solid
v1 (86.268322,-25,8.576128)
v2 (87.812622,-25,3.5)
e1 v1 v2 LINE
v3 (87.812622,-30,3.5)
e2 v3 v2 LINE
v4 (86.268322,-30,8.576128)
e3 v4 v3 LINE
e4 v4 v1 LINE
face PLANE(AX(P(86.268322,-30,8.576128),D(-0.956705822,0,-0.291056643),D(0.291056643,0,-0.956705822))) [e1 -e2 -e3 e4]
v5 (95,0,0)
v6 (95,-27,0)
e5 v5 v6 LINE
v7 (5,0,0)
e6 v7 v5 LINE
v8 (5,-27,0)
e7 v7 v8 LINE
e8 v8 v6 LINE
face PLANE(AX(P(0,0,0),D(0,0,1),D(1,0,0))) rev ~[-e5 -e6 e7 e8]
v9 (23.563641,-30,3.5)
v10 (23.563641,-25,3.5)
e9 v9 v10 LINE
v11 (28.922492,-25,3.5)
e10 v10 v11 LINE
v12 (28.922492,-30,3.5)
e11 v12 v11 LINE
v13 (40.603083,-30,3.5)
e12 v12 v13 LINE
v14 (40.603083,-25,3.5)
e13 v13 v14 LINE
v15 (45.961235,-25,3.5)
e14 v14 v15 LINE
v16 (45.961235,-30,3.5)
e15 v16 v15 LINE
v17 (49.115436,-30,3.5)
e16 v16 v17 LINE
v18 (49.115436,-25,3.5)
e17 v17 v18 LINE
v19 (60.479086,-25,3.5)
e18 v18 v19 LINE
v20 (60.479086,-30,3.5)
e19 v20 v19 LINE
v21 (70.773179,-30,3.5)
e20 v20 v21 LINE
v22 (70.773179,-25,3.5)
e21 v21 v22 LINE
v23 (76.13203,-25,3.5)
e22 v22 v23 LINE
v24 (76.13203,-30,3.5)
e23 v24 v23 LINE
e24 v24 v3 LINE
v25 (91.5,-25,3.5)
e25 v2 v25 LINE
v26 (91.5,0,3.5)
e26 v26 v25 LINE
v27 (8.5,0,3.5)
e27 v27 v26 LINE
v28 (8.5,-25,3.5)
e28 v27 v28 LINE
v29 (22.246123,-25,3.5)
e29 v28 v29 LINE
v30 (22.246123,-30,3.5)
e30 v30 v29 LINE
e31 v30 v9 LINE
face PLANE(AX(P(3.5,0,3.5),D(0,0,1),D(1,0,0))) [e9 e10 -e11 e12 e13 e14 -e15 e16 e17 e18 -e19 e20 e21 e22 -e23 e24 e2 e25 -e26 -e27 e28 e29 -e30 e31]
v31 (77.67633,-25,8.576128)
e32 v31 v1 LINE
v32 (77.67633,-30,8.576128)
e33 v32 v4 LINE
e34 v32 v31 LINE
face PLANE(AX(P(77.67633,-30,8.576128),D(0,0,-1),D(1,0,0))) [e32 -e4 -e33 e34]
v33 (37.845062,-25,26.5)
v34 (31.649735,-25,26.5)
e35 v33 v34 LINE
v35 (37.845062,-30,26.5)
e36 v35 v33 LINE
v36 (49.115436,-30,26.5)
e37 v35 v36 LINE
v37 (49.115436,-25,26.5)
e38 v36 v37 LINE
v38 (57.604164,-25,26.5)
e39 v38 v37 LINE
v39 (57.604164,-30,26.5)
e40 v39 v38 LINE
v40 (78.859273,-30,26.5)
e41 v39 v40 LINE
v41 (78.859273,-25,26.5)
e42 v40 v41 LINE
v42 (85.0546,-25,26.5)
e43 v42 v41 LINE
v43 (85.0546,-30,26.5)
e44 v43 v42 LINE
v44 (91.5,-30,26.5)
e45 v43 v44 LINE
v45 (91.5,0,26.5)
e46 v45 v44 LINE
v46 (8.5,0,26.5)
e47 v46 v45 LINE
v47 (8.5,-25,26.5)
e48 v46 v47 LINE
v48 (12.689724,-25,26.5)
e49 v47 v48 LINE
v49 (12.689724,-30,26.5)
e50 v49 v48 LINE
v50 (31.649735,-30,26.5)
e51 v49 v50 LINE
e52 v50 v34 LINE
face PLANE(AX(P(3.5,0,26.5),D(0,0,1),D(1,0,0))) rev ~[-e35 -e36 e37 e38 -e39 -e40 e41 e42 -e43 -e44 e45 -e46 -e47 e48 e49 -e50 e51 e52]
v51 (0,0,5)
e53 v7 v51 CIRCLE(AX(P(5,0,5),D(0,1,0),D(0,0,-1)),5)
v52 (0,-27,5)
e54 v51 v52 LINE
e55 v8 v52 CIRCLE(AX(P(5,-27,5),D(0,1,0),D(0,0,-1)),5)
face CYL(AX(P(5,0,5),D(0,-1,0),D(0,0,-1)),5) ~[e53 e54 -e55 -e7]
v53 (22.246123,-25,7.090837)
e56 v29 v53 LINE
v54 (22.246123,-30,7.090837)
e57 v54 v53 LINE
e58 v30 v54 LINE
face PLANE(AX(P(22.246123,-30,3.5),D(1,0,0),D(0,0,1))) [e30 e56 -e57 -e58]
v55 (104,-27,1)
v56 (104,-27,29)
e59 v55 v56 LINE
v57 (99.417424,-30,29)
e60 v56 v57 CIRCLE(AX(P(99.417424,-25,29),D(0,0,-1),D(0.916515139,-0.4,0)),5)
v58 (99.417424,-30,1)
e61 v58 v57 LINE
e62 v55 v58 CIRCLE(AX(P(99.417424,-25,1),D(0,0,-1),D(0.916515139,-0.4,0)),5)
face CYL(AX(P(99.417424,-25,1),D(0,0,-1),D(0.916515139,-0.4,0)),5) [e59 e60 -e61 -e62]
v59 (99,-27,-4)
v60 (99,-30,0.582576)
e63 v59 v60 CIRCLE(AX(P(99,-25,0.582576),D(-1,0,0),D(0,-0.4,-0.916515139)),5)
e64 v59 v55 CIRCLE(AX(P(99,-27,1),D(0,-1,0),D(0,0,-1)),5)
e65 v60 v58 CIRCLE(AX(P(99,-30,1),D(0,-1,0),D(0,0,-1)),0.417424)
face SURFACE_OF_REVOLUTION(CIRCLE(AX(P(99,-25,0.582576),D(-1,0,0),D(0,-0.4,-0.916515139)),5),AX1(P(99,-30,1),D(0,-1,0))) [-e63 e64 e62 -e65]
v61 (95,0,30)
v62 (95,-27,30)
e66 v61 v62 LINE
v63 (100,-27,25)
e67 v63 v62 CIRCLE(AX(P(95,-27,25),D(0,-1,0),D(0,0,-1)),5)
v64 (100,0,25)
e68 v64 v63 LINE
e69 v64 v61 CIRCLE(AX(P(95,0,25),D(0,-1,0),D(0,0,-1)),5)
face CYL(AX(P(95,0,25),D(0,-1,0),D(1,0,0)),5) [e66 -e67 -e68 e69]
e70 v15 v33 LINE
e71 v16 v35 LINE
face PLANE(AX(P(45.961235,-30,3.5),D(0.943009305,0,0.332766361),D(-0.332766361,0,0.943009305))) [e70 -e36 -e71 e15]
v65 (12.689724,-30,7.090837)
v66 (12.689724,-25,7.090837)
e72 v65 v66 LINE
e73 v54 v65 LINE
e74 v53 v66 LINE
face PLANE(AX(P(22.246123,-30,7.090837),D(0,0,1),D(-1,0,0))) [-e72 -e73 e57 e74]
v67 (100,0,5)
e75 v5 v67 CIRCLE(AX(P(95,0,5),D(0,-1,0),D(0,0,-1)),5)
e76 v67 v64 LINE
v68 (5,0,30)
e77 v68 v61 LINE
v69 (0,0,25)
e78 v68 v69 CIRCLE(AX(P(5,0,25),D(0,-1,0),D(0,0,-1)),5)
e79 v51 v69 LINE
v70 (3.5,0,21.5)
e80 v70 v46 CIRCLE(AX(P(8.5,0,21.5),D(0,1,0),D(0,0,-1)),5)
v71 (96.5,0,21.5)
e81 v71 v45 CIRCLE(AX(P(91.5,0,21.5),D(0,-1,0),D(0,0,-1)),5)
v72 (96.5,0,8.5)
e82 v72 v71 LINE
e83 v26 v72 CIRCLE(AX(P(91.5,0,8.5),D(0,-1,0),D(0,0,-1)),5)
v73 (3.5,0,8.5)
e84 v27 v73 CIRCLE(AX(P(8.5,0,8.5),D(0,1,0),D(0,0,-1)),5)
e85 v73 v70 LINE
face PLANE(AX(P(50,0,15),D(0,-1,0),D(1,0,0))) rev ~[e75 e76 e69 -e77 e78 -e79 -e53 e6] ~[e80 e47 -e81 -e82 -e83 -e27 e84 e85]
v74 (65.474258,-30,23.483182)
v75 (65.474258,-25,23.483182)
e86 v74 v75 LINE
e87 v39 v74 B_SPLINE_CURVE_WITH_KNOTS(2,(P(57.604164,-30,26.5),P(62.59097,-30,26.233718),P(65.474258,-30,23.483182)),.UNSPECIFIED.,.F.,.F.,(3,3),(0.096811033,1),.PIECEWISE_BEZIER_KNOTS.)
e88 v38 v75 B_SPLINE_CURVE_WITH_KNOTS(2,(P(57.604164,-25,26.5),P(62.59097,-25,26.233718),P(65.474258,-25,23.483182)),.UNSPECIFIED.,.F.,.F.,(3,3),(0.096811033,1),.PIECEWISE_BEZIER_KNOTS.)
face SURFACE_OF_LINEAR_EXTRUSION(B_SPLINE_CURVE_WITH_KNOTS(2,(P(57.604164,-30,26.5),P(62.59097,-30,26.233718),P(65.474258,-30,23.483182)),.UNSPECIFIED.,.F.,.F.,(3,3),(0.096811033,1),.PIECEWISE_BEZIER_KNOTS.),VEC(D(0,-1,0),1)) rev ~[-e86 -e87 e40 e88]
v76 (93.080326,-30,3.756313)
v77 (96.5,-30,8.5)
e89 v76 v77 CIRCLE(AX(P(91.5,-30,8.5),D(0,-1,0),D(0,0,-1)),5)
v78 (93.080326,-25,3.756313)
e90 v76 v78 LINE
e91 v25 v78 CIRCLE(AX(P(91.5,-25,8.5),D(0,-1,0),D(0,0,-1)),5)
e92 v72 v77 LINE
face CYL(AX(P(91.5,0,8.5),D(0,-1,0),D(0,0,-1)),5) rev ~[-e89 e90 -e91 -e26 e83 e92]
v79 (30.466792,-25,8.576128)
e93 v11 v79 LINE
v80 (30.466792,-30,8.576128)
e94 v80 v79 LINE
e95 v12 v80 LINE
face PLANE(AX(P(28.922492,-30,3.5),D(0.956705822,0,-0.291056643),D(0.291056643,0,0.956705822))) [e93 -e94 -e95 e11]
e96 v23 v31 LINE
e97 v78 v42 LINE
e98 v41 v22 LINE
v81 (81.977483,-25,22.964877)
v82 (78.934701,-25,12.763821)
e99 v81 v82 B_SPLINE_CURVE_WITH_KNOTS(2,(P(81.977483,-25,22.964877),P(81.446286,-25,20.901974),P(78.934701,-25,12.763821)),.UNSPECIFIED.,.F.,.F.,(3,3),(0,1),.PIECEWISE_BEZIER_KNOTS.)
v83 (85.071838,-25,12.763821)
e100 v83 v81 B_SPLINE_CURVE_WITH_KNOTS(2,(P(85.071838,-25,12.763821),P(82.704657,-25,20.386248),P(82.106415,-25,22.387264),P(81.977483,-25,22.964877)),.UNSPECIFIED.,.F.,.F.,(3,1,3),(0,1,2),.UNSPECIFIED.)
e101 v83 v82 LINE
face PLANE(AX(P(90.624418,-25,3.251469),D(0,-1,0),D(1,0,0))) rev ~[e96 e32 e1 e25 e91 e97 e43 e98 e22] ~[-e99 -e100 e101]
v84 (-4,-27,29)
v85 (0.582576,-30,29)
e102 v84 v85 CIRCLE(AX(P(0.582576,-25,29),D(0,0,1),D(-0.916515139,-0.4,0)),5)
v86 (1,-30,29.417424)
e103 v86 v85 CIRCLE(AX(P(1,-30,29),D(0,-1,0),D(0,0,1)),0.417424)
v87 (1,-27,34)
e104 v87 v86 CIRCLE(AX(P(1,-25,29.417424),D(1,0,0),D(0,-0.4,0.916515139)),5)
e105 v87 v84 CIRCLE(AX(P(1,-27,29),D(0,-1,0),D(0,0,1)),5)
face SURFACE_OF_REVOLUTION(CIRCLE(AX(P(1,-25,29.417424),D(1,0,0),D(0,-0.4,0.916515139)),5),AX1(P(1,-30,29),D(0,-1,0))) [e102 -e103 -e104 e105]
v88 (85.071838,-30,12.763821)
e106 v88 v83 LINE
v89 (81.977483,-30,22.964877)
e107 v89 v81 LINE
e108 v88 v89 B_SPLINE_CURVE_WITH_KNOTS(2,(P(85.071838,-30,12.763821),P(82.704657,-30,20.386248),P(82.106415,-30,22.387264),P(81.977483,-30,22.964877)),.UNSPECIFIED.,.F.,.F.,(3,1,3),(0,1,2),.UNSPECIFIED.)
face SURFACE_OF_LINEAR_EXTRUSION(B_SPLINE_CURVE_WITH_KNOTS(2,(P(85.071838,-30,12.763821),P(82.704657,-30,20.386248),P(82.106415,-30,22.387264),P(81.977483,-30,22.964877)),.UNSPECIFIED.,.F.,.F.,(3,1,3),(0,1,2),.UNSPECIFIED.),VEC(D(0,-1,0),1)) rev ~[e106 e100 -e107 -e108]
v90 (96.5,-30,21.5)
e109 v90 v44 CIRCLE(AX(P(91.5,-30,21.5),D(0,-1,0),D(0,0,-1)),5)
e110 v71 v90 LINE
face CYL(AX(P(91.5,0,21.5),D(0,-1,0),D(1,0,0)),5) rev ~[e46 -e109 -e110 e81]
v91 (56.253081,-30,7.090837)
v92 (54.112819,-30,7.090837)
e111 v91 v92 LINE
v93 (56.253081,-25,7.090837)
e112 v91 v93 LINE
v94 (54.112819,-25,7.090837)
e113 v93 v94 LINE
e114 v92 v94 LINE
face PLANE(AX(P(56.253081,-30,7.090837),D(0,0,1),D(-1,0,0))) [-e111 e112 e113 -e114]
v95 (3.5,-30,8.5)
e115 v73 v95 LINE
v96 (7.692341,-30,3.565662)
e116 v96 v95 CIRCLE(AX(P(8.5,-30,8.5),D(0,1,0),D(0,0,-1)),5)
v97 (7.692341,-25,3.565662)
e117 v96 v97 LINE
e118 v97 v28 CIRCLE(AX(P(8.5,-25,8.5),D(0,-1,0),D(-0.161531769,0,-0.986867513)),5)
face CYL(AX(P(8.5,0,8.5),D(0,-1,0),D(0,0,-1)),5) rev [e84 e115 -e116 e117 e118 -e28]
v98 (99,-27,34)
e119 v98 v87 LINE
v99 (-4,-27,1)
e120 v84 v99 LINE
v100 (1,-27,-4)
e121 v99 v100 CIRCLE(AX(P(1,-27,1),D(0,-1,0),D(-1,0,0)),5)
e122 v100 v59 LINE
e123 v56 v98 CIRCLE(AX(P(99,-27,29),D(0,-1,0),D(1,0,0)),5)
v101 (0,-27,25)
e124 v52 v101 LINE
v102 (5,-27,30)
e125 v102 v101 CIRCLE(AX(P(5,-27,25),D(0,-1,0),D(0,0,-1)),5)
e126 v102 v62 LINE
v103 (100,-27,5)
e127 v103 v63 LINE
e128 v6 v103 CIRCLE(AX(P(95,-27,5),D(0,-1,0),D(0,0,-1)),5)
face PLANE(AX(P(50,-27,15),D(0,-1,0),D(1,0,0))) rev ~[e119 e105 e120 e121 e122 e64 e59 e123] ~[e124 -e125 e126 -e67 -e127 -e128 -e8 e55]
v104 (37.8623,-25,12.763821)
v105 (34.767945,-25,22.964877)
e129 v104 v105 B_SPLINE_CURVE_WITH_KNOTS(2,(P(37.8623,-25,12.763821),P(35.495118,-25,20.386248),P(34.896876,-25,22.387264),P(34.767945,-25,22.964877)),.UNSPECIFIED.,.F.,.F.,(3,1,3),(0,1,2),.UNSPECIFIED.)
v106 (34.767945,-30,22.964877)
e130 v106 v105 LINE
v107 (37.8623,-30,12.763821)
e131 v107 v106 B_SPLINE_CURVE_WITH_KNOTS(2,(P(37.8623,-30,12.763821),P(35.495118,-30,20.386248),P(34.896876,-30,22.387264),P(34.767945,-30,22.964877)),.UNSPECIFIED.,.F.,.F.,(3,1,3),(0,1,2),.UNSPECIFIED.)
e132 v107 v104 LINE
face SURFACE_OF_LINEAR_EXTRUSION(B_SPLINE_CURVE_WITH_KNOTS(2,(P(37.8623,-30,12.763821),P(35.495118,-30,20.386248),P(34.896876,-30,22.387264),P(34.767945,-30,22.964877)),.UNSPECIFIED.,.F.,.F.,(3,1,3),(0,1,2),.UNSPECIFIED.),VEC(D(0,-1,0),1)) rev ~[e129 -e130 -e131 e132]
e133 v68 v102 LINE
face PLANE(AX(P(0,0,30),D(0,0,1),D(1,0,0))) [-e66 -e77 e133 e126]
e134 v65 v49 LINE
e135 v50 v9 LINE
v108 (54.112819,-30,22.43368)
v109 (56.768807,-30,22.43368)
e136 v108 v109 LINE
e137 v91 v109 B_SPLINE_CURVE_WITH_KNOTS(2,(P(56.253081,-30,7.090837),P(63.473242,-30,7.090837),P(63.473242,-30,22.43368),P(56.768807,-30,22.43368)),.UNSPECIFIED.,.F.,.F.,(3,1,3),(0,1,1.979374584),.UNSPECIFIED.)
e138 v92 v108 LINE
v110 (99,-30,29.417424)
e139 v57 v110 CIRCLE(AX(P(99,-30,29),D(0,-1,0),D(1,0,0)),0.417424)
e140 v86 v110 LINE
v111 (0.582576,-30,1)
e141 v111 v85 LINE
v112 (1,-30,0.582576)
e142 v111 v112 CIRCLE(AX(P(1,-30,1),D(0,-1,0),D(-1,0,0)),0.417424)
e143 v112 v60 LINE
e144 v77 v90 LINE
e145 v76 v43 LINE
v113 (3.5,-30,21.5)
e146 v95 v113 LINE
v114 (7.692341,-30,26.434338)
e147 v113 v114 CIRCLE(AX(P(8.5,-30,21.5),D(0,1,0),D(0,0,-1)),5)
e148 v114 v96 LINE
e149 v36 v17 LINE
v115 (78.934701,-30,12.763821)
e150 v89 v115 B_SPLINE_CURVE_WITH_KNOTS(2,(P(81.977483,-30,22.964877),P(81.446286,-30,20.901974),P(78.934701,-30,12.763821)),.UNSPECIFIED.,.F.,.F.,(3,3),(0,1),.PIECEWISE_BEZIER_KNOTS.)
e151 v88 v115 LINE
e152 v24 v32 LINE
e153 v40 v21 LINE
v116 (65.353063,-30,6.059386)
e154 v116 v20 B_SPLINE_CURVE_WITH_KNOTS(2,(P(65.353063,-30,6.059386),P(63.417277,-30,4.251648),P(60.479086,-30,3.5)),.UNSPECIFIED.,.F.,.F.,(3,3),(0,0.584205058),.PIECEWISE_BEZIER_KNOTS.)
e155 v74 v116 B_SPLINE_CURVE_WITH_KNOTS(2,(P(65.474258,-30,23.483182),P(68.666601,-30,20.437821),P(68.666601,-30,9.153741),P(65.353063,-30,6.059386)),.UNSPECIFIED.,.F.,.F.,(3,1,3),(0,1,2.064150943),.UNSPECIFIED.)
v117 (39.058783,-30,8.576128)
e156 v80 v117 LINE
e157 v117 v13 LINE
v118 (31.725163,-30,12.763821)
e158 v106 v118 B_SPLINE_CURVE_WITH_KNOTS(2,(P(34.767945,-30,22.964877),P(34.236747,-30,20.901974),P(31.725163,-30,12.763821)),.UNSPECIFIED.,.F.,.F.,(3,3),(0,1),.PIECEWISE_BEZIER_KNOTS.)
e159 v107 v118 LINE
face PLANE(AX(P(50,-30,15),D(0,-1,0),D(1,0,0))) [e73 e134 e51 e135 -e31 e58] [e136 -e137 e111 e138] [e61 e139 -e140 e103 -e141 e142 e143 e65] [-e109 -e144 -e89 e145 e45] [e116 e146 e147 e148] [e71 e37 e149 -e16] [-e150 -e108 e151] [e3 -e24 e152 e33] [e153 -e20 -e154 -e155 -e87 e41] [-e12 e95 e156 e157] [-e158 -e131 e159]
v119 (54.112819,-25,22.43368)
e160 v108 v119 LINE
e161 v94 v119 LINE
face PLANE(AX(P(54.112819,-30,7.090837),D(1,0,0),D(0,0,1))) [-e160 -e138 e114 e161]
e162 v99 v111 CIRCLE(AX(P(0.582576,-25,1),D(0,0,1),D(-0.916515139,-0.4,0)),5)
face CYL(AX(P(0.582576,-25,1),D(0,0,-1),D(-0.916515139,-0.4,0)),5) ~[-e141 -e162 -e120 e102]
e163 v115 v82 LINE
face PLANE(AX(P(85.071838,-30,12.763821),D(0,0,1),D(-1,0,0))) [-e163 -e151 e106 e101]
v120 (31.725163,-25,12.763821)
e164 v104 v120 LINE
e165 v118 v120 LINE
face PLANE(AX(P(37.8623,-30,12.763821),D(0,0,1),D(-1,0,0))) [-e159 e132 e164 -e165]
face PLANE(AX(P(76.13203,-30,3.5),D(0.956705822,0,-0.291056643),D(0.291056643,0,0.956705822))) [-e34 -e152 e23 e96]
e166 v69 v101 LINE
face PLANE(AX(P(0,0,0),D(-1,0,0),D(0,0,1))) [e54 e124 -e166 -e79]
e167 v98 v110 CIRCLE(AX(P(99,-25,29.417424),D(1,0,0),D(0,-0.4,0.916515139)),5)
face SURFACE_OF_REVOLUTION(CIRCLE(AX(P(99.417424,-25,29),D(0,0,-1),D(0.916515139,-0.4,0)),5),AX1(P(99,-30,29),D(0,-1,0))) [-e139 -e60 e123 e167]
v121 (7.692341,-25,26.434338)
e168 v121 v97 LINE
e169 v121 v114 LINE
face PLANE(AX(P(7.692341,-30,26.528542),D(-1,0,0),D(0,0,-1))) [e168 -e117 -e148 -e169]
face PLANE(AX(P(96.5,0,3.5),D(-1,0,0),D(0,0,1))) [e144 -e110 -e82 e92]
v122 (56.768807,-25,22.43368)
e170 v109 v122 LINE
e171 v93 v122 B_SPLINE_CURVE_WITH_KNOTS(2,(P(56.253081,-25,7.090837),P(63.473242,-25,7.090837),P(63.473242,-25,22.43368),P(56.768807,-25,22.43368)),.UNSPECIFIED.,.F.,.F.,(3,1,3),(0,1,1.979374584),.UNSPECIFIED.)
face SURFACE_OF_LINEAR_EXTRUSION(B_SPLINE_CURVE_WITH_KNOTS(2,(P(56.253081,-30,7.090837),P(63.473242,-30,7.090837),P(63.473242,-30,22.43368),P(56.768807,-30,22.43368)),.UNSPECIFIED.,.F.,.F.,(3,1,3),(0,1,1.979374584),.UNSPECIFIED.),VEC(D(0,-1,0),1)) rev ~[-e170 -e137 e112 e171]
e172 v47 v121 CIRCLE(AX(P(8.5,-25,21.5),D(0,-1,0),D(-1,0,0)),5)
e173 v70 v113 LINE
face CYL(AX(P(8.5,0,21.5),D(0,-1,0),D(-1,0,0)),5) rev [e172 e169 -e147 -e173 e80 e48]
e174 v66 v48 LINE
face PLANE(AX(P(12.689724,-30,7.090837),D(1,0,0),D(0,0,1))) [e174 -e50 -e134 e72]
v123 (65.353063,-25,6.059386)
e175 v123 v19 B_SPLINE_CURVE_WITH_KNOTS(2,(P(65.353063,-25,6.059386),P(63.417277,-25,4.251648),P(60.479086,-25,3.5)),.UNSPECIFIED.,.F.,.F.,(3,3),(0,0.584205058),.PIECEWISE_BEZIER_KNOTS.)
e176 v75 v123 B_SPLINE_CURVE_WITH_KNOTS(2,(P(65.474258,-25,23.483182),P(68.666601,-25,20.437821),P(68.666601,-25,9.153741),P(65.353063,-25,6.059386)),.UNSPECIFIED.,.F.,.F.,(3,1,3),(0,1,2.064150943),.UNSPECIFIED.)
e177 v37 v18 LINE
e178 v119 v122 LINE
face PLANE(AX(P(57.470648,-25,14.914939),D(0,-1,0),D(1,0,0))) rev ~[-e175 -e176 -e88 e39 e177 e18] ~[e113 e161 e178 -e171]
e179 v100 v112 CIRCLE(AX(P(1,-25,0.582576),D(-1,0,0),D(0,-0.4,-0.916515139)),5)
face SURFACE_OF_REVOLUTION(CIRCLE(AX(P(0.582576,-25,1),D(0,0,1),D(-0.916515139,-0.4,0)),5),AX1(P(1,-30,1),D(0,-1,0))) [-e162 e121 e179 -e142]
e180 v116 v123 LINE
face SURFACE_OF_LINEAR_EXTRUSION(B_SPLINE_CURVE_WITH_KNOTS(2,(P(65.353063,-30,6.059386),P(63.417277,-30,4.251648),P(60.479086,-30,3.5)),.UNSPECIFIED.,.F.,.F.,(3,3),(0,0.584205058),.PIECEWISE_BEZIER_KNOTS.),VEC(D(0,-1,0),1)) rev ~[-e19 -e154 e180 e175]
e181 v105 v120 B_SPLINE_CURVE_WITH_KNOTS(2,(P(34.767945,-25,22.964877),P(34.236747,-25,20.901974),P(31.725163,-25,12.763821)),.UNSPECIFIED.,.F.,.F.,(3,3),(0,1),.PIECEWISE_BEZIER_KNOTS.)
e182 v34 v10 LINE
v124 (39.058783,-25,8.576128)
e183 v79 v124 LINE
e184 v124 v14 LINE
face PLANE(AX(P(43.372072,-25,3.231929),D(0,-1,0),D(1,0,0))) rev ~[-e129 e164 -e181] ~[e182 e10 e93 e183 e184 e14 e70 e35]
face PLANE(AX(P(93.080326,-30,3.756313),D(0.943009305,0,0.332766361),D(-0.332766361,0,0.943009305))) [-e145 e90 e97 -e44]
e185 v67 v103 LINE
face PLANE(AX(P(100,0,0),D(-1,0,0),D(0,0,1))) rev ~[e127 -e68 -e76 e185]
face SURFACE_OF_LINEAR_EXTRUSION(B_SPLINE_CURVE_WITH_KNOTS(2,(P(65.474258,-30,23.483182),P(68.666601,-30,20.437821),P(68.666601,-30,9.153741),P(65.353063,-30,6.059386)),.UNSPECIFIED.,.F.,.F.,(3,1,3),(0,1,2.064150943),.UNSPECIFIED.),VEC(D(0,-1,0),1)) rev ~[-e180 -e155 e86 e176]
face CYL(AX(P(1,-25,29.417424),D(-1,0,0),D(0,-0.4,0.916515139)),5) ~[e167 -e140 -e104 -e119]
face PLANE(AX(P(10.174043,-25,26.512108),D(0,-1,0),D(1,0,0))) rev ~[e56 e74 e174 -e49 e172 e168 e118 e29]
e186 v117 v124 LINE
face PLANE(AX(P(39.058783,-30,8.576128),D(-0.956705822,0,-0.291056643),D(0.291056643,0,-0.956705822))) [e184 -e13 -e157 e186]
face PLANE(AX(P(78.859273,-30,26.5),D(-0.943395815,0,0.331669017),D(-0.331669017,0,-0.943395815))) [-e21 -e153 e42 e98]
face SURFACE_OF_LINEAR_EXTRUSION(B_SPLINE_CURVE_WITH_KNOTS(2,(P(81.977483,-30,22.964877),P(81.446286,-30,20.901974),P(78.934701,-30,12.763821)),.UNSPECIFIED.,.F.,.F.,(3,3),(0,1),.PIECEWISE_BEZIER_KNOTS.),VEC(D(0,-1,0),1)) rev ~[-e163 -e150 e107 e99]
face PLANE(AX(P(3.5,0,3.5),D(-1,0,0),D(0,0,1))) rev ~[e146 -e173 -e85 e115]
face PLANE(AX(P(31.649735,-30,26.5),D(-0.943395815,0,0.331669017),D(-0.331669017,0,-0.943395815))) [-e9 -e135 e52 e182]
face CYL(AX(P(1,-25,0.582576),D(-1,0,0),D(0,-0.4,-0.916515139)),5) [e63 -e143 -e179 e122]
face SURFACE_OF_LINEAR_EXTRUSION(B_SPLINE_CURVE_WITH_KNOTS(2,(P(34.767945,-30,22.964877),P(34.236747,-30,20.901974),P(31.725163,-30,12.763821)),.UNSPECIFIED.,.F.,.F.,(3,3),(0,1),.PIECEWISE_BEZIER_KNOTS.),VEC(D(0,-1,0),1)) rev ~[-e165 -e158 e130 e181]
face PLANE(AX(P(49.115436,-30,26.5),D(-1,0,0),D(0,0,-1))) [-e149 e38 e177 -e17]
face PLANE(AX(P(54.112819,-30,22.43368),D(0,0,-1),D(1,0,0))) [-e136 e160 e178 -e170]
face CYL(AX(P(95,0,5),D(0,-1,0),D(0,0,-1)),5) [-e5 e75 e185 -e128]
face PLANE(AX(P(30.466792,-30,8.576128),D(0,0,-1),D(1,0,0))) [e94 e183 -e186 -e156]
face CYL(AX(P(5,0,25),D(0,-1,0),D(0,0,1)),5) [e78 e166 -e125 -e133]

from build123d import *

# Parameters (mm, degrees)
F0_W         = 100
F0_H         = 30
F0_W_2       = 93
F0_H_2       = 23
F1_DEPTH     = 30
F2_W         = 100
F2_H         = 30
F3_DEPTH     = 3
F4_T1_DEPTH  = 28
F4_T3_DEPTH  = 98
F4_T6_ANGLE  = 90
F4_T8_ANGLE  = 90
F4_T10_ANGLE = 90
F4_T12_ANGLE = 90
F5_R         = 5
F7_DEPTH     = 25
F8_T         = -4
F11_DEPTH    = 5


# Not quite as in the source:
# - a fillet or chamfer that OpenCascade refuses, or shapes differently, is made with other operations: its cross-section is extruded or revolved along the edge and cut away or added
# - the program builds the solid bodies; features that only make, move or delete a surface that nothing else refers to are left out


with BuildPart() as f1:
    # F0 (on Front) → F1 (new body)
    with BuildSketch(Plane.XZ):
        with Locations((50, 15)):
            Rectangle(F0_W, F0_H)
        with Locations((50, 15)):
            Rectangle(F0_W_2, F0_H_2, mode=Mode.SUBTRACT)
    extrude(amount=F1_DEPTH)

    # F2 (on face) → F3 (join)
    with BuildSketch(Plane.XZ.offset(30)):
        with BuildLine():
            Line((99, 34), (1, 34))
            ThreePointArc((1, 34), (-2.5355339059, 32.5355339059), (-4, 29))
            Line((-4, 29), (-4, 1))
            ThreePointArc((-4, 1), (-2.5355339059, -2.5355339059), (1, -4))
            Line((1, -4), (99, -4))
            ThreePointArc((99, -4), (102.5355339059, -2.5355339059), (104, 1))
            Line((104, 1), (104, 29))
            ThreePointArc((104, 29), (102.5355339059, 32.5355339059), (99, 34))
        make_face()
        with Locations((50, 15)):
            Rectangle(F2_W, F2_H, mode=Mode.SUBTRACT)
    extrude(amount=-F3_DEPTH)

    # F4: fillet of radius 5 on 1 edges, made by hand

    # F4_s2 → F4_t1 (cut)
    with BuildSketch(Plane.XY.offset(1)):
        with BuildLine():
            ThreePointArc((104, -27), (102.1560370926, -29.1833001327), (99.417424305, -30))
            Line((99.417424305, -30), (104, -30))
            Line((104, -30), (104, -27))
        make_face()
        with BuildLine():
            ThreePointArc((-4, -27), (-2.1560370926, -29.1833001327), (0.582575695, -30))
            Line((0.582575695, -30), (-4, -30))
            Line((-4, -30), (-4, -27))
        make_face()
    extrude(amount=F4_T1_DEPTH, mode=Mode.SUBTRACT)

    # F4_s4 → F4_t3 (cut)
    with BuildSketch(Plane.YZ.offset(1)):
        with BuildLine():
            ThreePointArc((-27, 34), (-29.1833001327, 32.1560370926), (-30, 29.417424305))
            Line((-30, 29.417424305), (-30, 34))
            Line((-30, 34), (-27, 34))
        make_face()
        with BuildLine():
            ThreePointArc((-27, -4), (-29.1833001327, -2.1560370926), (-30, 0.582575695))
            Line((-30, 0.582575695), (-30, -4))
            Line((-30, -4), (-27, -4))
        make_face()
    extrude(amount=F4_T3_DEPTH, mode=Mode.SUBTRACT)

    # F4_s5 → F4_t6 (revolve, cut)
    with BuildSketch(Plane.XY.offset(29)):
        with BuildLine():
            ThreePointArc((104, -27), (102.1560370926, -29.1833001327), (99.417424305, -30))
            Line((99.417424305, -30), (104, -30))
            Line((104, -30), (104, -27))
        make_face()
    revolve(axis=Axis((99, -30, 29), (0, -1, 0)), revolution_arc=F4_T6_ANGLE, mode=Mode.SUBTRACT)

    # F4_s7 → F4_t8 (revolve, cut)
    with BuildSketch(Plane.YZ.offset(1)):
        with BuildLine():
            ThreePointArc((-27, 34), (-29.1833001327, 32.1560370926), (-30, 29.417424305))
            Line((-30, 29.417424305), (-30, 34))
            Line((-30, 34), (-27, 34))
        make_face()
    revolve(axis=Axis((1, -30, 29), (0, -1, 0)), revolution_arc=F4_T8_ANGLE, mode=Mode.SUBTRACT)

    # F4_s9 → F4_t10 (revolve, cut)
    with BuildSketch(Plane.XY.offset(1)):
        with BuildLine():
            ThreePointArc((-4, -27), (-2.1560370926, -29.1833001327), (0.582575695, -30))
            Line((0.582575695, -30), (-4, -30))
            Line((-4, -30), (-4, -27))
        make_face()
    revolve(axis=Axis((1, -30, 1), (0, -1, 0)), revolution_arc=F4_T10_ANGLE, mode=Mode.SUBTRACT)

    # F4_s11 → F4_t12 (revolve, cut)
    with BuildSketch(Plane.YZ.offset(99)):
        with BuildLine():
            ThreePointArc((-27, -4), (-29.1833001327, -2.1560370926), (-30, 0.582575695))
            Line((-30, 0.582575695), (-30, -4))
            Line((-30, -4), (-27, -4))
        make_face()
    revolve(axis=Axis((99, -30, 1), (0, -1, 0)), revolution_arc=F4_T12_ANGLE, mode=Mode.SUBTRACT)

    # F5
    f5_edges = [f1.edges().sort_by_distance(p)[0] for p in [
        (96.5, -15, 26.5),
        (96.5, -15, 3.5),
        (3.5, -15, 26.5),
        (3.5, -15, 3.5),
        (100, -13.5, 30),
        (0, -13.5, 30),
        (0, -13.5, 0),
        (100, -13.5, 0),
    ]]
    fillet(f5_edges, radius=F5_R)

    # F10 (on face) → F11 (join)
    with BuildSketch(Plane.XZ.offset(30)):
        with BuildLine():
            Line((7.6923411562, 26.5285422666), (7.6923411562, 26.4343375636))
            ThreePointArc((7.6923411562, 26.4343375636), (8.0948381917, 26.4835573549), (8.5, 26.5))
            Line((8.5, 26.5), (12.6897240143, 26.5))
            Line((12.6897240143, 26.5), (12.6897240143, 26.5285422666))
            Line((12.6897240143, 26.5285422666), (7.6923411562, 26.5285422666))
        make_face()
        Polygon((45.961234712, 3.5), (40.6030832841, 3.5), (40.7658357581, 2.9650311428), (46.1500129552, 2.9650311428), align=None)
        Polygon((31.649735074, 26.5), (23.5636409154, 3.5), (28.9224919537, 3.5), (30.4667918286, 8.5761276853), (39.0587834093, 8.5761276853), (40.6030832841, 3.5), (45.961234712, 3.5), (37.8450620877, 26.5), align=None)
        with BuildLine():
            add(Edge.make_bspline(
                [(37.8622995877, 12.7638210608), (35.4951182339, 20.3862481654), (35.1959972785, 21.3867561886)],
                knots=[0, 0, 0, 1, 1, 1], degree=2))
            Line((37.8622995877, 12.7638210608), (31.7251627444, 12.7638210608))
            add(Edge.make_bspline(
                [(34.7679448768, 22.9648770911), (34.2367473181, 20.9019739505), (31.7251627444, 12.7638210608)],
                knots=[0, 0, 0, 1, 1, 1], degree=2))
            add(Edge.make_bspline(
                [(35.1959972785, 21.3867561886), (34.8968763231, 22.3872642118), (34.7679448768, 22.9648770911)],
                knots=[0, 0, 0, 1, 1, 1], degree=2))
        make_face(mode=Mode.SUBTRACT)
        with BuildLine():
            Line((57.6041635325, 26.5), (49.1154362198, 26.5))
            Line((49.1154362198, 26.5), (49.1154362198, 3.5))
            Line((49.1154362198, 3.5), (60.4790861077, 3.5))
            add(Edge.make_bspline(
                [(65.3530625654, 6.0593858538), (63.4172768077, 4.2516481812), (60.4790861077, 3.5)],
                knots=[0, 0, 0, 0.5842050577, 0.5842050577, 0.5842050577], degree=2))
            add(Edge.make_bspline(
                [(68.666600735, 14.9711274212), (68.666600735, 9.1537405647), (65.3530625654, 6.0593858538)],
                knots=[0, 0, 0, 1, 1, 1], degree=2))
            add(Edge.make_bspline(
                [(65.4742581249, 23.4831815052), (68.666600735, 20.4378207439), (68.666600735, 14.9711274212)],
                knots=[0, 0, 0, 1, 1, 1], degree=2))
            add(Edge.make_bspline(
                [(57.6041635325, 26.5), (62.5909695012, 26.2337177448), (65.4742581249, 23.4831815052)],
                knots=[0.0968110332, 0.0968110332, 0.0968110332, 1, 1, 1], degree=2))
        make_face()
        with BuildLine():
            add(Edge.make_bspline(
                [(63.4732420785, 14.842195975), (63.4732420785, 22.4336795324), (56.7688068715, 22.4336795324)],
                knots=[0, 0, 0, 1, 1, 1], degree=2))
            add(Edge.make_bspline(
                [(56.2530810863, 7.0908374241), (63.4732420785, 7.0908374241), (63.4732420785, 14.842195975)],
                knots=[0, 0, 0, 1, 1, 1], degree=2))
            Line((56.2530810863, 7.0908374241), (54.1128190779, 7.0908374241))
            Line((54.1128190779, 7.0908374241), (54.1128190779, 22.4336795324))
            Line((54.1128190779, 22.4336795324), (56.7688068715, 22.4336795324))
        make_face(mode=Mode.SUBTRACT)
        with BuildLine():
            Line((93.3595513282, 2.9650311428), (93.0803262059, 3.7563127124))
            ThreePointArc((93.0803262059, 3.7563127124), (92.3004884639, 3.5644941273), (91.5, 3.5))
            Line((91.5, 3.5), (87.8126216572, 3.5))
            Line((87.8126216572, 3.5), (87.9753741312, 2.9650311428))
            Line((87.9753741312, 2.9650311428), (93.3595513282, 2.9650311428))
        make_face()
        with BuildLine():
            Line((85.0546004608, 26.5), (78.8592734471, 26.5))
            Line((78.8592734471, 26.5), (70.7731792884, 3.5))
            Line((70.7731792884, 3.5), (76.1320303268, 3.5))
            Line((76.1320303268, 3.5), (77.6763302017, 8.5761276853))
            Line((77.6763302017, 8.5761276853), (86.2683217823, 8.5761276853))
            Line((86.2683217823, 8.5761276853), (87.8126216572, 3.5))
            Line((87.8126216572, 3.5), (91.5, 3.5))
            ThreePointArc((91.5, 3.5), (92.3004884639, 3.5644941273), (93.0803262059, 3.7563127124))
            Line((93.0803262059, 3.7563127124), (85.0546004608, 26.5))
        make_face()
        with BuildLine():
            add(Edge.make_bspline(
                [(85.0718379608, 12.7638210608), (82.7046566069, 20.3862481654), (82.4055356515, 21.3867561886)],
                knots=[0, 0, 0, 1, 1, 1], degree=2))
            Line((85.0718379608, 12.7638210608), (78.9347011174, 12.7638210608))
            add(Edge.make_bspline(
                [(81.9774832498, 22.9648770911), (81.4462856911, 20.9019739505), (78.9347011174, 12.7638210608)],
                knots=[0, 0, 0, 1, 1, 1], degree=2))
            add(Edge.make_bspline(
                [(82.4055356515, 21.3867561886), (82.1064146961, 22.3872642118), (81.9774832498, 22.9648770911)],
                knots=[0, 0, 0, 1, 1, 1], degree=2))
        make_face(mode=Mode.SUBTRACT)
        with BuildLine():
            Line((7.6923411562, 26.4343375636), (7.6923411562, 3.5656624364))
            ThreePointArc((7.6923411562, 3.5656624364), (8.0948381917, 3.5164426451), (8.5, 3.5))
            Line((8.5, 3.5), (22.2461228132, 3.5))
            Line((22.2461228132, 3.5), (22.2461228132, 7.0908374241))
            Line((22.2461228132, 7.0908374241), (12.6897240143, 7.0908374241))
            Line((12.6897240143, 7.0908374241), (12.6897240143, 26.5))
            Line((12.6897240143, 26.5), (8.5, 26.5))
            ThreePointArc((8.5, 26.5), (8.0948381917, 26.4835573549), (7.6923411562, 26.4343375636))
        make_face()
    extrude(amount=-F11_DEPTH)


with BuildPart() as f7:
    # F6 (on Front) → F7 (new body)
    with BuildSketch(Plane.XZ):
        with BuildLine():
            add(Edge.make_bspline(
                [(-64.6141692996, 66.2774592638), (-57.3632405413, 65.4820326957), (-47.9649979836, 57.4179015801), (-35.44136599, 46.6694720335), (-22.7593679958, 45.2438805274), (-12.5503852984, 34.717586563), (-17.5949754851, 20.0575363254), (-41.16593926, 26.5737663135), (-51.8938502431, 42.0416927734), (-69.1953728198, 34.6634255071), (-93.0939149449, 45.9245842151), (-91.9481797024, 61.1508032719), (-73.0416739767, 67.2019561588), (-64.6141692996, 66.2774592638)],
                knots=[0, 0, 0, 0, 0.098374264, 0.187884813, 0.2668345062, 0.3470994933, 0.4198681033, 0.5217972145, 0.614123746, 0.7049715118, 0.8132456976, 0.8856629823, 1, 1, 1, 1], degree=3))
        make_face()
    extrude(amount=F7_DEPTH)

    # F8
    f8_openings = [f7.faces().sort_by_distance(p)[0] for p in [
        (-54.148596, -25, 45.943669),
    ]]
    offset(amount=F8_T, openings=f8_openings)


solid = f1.part
